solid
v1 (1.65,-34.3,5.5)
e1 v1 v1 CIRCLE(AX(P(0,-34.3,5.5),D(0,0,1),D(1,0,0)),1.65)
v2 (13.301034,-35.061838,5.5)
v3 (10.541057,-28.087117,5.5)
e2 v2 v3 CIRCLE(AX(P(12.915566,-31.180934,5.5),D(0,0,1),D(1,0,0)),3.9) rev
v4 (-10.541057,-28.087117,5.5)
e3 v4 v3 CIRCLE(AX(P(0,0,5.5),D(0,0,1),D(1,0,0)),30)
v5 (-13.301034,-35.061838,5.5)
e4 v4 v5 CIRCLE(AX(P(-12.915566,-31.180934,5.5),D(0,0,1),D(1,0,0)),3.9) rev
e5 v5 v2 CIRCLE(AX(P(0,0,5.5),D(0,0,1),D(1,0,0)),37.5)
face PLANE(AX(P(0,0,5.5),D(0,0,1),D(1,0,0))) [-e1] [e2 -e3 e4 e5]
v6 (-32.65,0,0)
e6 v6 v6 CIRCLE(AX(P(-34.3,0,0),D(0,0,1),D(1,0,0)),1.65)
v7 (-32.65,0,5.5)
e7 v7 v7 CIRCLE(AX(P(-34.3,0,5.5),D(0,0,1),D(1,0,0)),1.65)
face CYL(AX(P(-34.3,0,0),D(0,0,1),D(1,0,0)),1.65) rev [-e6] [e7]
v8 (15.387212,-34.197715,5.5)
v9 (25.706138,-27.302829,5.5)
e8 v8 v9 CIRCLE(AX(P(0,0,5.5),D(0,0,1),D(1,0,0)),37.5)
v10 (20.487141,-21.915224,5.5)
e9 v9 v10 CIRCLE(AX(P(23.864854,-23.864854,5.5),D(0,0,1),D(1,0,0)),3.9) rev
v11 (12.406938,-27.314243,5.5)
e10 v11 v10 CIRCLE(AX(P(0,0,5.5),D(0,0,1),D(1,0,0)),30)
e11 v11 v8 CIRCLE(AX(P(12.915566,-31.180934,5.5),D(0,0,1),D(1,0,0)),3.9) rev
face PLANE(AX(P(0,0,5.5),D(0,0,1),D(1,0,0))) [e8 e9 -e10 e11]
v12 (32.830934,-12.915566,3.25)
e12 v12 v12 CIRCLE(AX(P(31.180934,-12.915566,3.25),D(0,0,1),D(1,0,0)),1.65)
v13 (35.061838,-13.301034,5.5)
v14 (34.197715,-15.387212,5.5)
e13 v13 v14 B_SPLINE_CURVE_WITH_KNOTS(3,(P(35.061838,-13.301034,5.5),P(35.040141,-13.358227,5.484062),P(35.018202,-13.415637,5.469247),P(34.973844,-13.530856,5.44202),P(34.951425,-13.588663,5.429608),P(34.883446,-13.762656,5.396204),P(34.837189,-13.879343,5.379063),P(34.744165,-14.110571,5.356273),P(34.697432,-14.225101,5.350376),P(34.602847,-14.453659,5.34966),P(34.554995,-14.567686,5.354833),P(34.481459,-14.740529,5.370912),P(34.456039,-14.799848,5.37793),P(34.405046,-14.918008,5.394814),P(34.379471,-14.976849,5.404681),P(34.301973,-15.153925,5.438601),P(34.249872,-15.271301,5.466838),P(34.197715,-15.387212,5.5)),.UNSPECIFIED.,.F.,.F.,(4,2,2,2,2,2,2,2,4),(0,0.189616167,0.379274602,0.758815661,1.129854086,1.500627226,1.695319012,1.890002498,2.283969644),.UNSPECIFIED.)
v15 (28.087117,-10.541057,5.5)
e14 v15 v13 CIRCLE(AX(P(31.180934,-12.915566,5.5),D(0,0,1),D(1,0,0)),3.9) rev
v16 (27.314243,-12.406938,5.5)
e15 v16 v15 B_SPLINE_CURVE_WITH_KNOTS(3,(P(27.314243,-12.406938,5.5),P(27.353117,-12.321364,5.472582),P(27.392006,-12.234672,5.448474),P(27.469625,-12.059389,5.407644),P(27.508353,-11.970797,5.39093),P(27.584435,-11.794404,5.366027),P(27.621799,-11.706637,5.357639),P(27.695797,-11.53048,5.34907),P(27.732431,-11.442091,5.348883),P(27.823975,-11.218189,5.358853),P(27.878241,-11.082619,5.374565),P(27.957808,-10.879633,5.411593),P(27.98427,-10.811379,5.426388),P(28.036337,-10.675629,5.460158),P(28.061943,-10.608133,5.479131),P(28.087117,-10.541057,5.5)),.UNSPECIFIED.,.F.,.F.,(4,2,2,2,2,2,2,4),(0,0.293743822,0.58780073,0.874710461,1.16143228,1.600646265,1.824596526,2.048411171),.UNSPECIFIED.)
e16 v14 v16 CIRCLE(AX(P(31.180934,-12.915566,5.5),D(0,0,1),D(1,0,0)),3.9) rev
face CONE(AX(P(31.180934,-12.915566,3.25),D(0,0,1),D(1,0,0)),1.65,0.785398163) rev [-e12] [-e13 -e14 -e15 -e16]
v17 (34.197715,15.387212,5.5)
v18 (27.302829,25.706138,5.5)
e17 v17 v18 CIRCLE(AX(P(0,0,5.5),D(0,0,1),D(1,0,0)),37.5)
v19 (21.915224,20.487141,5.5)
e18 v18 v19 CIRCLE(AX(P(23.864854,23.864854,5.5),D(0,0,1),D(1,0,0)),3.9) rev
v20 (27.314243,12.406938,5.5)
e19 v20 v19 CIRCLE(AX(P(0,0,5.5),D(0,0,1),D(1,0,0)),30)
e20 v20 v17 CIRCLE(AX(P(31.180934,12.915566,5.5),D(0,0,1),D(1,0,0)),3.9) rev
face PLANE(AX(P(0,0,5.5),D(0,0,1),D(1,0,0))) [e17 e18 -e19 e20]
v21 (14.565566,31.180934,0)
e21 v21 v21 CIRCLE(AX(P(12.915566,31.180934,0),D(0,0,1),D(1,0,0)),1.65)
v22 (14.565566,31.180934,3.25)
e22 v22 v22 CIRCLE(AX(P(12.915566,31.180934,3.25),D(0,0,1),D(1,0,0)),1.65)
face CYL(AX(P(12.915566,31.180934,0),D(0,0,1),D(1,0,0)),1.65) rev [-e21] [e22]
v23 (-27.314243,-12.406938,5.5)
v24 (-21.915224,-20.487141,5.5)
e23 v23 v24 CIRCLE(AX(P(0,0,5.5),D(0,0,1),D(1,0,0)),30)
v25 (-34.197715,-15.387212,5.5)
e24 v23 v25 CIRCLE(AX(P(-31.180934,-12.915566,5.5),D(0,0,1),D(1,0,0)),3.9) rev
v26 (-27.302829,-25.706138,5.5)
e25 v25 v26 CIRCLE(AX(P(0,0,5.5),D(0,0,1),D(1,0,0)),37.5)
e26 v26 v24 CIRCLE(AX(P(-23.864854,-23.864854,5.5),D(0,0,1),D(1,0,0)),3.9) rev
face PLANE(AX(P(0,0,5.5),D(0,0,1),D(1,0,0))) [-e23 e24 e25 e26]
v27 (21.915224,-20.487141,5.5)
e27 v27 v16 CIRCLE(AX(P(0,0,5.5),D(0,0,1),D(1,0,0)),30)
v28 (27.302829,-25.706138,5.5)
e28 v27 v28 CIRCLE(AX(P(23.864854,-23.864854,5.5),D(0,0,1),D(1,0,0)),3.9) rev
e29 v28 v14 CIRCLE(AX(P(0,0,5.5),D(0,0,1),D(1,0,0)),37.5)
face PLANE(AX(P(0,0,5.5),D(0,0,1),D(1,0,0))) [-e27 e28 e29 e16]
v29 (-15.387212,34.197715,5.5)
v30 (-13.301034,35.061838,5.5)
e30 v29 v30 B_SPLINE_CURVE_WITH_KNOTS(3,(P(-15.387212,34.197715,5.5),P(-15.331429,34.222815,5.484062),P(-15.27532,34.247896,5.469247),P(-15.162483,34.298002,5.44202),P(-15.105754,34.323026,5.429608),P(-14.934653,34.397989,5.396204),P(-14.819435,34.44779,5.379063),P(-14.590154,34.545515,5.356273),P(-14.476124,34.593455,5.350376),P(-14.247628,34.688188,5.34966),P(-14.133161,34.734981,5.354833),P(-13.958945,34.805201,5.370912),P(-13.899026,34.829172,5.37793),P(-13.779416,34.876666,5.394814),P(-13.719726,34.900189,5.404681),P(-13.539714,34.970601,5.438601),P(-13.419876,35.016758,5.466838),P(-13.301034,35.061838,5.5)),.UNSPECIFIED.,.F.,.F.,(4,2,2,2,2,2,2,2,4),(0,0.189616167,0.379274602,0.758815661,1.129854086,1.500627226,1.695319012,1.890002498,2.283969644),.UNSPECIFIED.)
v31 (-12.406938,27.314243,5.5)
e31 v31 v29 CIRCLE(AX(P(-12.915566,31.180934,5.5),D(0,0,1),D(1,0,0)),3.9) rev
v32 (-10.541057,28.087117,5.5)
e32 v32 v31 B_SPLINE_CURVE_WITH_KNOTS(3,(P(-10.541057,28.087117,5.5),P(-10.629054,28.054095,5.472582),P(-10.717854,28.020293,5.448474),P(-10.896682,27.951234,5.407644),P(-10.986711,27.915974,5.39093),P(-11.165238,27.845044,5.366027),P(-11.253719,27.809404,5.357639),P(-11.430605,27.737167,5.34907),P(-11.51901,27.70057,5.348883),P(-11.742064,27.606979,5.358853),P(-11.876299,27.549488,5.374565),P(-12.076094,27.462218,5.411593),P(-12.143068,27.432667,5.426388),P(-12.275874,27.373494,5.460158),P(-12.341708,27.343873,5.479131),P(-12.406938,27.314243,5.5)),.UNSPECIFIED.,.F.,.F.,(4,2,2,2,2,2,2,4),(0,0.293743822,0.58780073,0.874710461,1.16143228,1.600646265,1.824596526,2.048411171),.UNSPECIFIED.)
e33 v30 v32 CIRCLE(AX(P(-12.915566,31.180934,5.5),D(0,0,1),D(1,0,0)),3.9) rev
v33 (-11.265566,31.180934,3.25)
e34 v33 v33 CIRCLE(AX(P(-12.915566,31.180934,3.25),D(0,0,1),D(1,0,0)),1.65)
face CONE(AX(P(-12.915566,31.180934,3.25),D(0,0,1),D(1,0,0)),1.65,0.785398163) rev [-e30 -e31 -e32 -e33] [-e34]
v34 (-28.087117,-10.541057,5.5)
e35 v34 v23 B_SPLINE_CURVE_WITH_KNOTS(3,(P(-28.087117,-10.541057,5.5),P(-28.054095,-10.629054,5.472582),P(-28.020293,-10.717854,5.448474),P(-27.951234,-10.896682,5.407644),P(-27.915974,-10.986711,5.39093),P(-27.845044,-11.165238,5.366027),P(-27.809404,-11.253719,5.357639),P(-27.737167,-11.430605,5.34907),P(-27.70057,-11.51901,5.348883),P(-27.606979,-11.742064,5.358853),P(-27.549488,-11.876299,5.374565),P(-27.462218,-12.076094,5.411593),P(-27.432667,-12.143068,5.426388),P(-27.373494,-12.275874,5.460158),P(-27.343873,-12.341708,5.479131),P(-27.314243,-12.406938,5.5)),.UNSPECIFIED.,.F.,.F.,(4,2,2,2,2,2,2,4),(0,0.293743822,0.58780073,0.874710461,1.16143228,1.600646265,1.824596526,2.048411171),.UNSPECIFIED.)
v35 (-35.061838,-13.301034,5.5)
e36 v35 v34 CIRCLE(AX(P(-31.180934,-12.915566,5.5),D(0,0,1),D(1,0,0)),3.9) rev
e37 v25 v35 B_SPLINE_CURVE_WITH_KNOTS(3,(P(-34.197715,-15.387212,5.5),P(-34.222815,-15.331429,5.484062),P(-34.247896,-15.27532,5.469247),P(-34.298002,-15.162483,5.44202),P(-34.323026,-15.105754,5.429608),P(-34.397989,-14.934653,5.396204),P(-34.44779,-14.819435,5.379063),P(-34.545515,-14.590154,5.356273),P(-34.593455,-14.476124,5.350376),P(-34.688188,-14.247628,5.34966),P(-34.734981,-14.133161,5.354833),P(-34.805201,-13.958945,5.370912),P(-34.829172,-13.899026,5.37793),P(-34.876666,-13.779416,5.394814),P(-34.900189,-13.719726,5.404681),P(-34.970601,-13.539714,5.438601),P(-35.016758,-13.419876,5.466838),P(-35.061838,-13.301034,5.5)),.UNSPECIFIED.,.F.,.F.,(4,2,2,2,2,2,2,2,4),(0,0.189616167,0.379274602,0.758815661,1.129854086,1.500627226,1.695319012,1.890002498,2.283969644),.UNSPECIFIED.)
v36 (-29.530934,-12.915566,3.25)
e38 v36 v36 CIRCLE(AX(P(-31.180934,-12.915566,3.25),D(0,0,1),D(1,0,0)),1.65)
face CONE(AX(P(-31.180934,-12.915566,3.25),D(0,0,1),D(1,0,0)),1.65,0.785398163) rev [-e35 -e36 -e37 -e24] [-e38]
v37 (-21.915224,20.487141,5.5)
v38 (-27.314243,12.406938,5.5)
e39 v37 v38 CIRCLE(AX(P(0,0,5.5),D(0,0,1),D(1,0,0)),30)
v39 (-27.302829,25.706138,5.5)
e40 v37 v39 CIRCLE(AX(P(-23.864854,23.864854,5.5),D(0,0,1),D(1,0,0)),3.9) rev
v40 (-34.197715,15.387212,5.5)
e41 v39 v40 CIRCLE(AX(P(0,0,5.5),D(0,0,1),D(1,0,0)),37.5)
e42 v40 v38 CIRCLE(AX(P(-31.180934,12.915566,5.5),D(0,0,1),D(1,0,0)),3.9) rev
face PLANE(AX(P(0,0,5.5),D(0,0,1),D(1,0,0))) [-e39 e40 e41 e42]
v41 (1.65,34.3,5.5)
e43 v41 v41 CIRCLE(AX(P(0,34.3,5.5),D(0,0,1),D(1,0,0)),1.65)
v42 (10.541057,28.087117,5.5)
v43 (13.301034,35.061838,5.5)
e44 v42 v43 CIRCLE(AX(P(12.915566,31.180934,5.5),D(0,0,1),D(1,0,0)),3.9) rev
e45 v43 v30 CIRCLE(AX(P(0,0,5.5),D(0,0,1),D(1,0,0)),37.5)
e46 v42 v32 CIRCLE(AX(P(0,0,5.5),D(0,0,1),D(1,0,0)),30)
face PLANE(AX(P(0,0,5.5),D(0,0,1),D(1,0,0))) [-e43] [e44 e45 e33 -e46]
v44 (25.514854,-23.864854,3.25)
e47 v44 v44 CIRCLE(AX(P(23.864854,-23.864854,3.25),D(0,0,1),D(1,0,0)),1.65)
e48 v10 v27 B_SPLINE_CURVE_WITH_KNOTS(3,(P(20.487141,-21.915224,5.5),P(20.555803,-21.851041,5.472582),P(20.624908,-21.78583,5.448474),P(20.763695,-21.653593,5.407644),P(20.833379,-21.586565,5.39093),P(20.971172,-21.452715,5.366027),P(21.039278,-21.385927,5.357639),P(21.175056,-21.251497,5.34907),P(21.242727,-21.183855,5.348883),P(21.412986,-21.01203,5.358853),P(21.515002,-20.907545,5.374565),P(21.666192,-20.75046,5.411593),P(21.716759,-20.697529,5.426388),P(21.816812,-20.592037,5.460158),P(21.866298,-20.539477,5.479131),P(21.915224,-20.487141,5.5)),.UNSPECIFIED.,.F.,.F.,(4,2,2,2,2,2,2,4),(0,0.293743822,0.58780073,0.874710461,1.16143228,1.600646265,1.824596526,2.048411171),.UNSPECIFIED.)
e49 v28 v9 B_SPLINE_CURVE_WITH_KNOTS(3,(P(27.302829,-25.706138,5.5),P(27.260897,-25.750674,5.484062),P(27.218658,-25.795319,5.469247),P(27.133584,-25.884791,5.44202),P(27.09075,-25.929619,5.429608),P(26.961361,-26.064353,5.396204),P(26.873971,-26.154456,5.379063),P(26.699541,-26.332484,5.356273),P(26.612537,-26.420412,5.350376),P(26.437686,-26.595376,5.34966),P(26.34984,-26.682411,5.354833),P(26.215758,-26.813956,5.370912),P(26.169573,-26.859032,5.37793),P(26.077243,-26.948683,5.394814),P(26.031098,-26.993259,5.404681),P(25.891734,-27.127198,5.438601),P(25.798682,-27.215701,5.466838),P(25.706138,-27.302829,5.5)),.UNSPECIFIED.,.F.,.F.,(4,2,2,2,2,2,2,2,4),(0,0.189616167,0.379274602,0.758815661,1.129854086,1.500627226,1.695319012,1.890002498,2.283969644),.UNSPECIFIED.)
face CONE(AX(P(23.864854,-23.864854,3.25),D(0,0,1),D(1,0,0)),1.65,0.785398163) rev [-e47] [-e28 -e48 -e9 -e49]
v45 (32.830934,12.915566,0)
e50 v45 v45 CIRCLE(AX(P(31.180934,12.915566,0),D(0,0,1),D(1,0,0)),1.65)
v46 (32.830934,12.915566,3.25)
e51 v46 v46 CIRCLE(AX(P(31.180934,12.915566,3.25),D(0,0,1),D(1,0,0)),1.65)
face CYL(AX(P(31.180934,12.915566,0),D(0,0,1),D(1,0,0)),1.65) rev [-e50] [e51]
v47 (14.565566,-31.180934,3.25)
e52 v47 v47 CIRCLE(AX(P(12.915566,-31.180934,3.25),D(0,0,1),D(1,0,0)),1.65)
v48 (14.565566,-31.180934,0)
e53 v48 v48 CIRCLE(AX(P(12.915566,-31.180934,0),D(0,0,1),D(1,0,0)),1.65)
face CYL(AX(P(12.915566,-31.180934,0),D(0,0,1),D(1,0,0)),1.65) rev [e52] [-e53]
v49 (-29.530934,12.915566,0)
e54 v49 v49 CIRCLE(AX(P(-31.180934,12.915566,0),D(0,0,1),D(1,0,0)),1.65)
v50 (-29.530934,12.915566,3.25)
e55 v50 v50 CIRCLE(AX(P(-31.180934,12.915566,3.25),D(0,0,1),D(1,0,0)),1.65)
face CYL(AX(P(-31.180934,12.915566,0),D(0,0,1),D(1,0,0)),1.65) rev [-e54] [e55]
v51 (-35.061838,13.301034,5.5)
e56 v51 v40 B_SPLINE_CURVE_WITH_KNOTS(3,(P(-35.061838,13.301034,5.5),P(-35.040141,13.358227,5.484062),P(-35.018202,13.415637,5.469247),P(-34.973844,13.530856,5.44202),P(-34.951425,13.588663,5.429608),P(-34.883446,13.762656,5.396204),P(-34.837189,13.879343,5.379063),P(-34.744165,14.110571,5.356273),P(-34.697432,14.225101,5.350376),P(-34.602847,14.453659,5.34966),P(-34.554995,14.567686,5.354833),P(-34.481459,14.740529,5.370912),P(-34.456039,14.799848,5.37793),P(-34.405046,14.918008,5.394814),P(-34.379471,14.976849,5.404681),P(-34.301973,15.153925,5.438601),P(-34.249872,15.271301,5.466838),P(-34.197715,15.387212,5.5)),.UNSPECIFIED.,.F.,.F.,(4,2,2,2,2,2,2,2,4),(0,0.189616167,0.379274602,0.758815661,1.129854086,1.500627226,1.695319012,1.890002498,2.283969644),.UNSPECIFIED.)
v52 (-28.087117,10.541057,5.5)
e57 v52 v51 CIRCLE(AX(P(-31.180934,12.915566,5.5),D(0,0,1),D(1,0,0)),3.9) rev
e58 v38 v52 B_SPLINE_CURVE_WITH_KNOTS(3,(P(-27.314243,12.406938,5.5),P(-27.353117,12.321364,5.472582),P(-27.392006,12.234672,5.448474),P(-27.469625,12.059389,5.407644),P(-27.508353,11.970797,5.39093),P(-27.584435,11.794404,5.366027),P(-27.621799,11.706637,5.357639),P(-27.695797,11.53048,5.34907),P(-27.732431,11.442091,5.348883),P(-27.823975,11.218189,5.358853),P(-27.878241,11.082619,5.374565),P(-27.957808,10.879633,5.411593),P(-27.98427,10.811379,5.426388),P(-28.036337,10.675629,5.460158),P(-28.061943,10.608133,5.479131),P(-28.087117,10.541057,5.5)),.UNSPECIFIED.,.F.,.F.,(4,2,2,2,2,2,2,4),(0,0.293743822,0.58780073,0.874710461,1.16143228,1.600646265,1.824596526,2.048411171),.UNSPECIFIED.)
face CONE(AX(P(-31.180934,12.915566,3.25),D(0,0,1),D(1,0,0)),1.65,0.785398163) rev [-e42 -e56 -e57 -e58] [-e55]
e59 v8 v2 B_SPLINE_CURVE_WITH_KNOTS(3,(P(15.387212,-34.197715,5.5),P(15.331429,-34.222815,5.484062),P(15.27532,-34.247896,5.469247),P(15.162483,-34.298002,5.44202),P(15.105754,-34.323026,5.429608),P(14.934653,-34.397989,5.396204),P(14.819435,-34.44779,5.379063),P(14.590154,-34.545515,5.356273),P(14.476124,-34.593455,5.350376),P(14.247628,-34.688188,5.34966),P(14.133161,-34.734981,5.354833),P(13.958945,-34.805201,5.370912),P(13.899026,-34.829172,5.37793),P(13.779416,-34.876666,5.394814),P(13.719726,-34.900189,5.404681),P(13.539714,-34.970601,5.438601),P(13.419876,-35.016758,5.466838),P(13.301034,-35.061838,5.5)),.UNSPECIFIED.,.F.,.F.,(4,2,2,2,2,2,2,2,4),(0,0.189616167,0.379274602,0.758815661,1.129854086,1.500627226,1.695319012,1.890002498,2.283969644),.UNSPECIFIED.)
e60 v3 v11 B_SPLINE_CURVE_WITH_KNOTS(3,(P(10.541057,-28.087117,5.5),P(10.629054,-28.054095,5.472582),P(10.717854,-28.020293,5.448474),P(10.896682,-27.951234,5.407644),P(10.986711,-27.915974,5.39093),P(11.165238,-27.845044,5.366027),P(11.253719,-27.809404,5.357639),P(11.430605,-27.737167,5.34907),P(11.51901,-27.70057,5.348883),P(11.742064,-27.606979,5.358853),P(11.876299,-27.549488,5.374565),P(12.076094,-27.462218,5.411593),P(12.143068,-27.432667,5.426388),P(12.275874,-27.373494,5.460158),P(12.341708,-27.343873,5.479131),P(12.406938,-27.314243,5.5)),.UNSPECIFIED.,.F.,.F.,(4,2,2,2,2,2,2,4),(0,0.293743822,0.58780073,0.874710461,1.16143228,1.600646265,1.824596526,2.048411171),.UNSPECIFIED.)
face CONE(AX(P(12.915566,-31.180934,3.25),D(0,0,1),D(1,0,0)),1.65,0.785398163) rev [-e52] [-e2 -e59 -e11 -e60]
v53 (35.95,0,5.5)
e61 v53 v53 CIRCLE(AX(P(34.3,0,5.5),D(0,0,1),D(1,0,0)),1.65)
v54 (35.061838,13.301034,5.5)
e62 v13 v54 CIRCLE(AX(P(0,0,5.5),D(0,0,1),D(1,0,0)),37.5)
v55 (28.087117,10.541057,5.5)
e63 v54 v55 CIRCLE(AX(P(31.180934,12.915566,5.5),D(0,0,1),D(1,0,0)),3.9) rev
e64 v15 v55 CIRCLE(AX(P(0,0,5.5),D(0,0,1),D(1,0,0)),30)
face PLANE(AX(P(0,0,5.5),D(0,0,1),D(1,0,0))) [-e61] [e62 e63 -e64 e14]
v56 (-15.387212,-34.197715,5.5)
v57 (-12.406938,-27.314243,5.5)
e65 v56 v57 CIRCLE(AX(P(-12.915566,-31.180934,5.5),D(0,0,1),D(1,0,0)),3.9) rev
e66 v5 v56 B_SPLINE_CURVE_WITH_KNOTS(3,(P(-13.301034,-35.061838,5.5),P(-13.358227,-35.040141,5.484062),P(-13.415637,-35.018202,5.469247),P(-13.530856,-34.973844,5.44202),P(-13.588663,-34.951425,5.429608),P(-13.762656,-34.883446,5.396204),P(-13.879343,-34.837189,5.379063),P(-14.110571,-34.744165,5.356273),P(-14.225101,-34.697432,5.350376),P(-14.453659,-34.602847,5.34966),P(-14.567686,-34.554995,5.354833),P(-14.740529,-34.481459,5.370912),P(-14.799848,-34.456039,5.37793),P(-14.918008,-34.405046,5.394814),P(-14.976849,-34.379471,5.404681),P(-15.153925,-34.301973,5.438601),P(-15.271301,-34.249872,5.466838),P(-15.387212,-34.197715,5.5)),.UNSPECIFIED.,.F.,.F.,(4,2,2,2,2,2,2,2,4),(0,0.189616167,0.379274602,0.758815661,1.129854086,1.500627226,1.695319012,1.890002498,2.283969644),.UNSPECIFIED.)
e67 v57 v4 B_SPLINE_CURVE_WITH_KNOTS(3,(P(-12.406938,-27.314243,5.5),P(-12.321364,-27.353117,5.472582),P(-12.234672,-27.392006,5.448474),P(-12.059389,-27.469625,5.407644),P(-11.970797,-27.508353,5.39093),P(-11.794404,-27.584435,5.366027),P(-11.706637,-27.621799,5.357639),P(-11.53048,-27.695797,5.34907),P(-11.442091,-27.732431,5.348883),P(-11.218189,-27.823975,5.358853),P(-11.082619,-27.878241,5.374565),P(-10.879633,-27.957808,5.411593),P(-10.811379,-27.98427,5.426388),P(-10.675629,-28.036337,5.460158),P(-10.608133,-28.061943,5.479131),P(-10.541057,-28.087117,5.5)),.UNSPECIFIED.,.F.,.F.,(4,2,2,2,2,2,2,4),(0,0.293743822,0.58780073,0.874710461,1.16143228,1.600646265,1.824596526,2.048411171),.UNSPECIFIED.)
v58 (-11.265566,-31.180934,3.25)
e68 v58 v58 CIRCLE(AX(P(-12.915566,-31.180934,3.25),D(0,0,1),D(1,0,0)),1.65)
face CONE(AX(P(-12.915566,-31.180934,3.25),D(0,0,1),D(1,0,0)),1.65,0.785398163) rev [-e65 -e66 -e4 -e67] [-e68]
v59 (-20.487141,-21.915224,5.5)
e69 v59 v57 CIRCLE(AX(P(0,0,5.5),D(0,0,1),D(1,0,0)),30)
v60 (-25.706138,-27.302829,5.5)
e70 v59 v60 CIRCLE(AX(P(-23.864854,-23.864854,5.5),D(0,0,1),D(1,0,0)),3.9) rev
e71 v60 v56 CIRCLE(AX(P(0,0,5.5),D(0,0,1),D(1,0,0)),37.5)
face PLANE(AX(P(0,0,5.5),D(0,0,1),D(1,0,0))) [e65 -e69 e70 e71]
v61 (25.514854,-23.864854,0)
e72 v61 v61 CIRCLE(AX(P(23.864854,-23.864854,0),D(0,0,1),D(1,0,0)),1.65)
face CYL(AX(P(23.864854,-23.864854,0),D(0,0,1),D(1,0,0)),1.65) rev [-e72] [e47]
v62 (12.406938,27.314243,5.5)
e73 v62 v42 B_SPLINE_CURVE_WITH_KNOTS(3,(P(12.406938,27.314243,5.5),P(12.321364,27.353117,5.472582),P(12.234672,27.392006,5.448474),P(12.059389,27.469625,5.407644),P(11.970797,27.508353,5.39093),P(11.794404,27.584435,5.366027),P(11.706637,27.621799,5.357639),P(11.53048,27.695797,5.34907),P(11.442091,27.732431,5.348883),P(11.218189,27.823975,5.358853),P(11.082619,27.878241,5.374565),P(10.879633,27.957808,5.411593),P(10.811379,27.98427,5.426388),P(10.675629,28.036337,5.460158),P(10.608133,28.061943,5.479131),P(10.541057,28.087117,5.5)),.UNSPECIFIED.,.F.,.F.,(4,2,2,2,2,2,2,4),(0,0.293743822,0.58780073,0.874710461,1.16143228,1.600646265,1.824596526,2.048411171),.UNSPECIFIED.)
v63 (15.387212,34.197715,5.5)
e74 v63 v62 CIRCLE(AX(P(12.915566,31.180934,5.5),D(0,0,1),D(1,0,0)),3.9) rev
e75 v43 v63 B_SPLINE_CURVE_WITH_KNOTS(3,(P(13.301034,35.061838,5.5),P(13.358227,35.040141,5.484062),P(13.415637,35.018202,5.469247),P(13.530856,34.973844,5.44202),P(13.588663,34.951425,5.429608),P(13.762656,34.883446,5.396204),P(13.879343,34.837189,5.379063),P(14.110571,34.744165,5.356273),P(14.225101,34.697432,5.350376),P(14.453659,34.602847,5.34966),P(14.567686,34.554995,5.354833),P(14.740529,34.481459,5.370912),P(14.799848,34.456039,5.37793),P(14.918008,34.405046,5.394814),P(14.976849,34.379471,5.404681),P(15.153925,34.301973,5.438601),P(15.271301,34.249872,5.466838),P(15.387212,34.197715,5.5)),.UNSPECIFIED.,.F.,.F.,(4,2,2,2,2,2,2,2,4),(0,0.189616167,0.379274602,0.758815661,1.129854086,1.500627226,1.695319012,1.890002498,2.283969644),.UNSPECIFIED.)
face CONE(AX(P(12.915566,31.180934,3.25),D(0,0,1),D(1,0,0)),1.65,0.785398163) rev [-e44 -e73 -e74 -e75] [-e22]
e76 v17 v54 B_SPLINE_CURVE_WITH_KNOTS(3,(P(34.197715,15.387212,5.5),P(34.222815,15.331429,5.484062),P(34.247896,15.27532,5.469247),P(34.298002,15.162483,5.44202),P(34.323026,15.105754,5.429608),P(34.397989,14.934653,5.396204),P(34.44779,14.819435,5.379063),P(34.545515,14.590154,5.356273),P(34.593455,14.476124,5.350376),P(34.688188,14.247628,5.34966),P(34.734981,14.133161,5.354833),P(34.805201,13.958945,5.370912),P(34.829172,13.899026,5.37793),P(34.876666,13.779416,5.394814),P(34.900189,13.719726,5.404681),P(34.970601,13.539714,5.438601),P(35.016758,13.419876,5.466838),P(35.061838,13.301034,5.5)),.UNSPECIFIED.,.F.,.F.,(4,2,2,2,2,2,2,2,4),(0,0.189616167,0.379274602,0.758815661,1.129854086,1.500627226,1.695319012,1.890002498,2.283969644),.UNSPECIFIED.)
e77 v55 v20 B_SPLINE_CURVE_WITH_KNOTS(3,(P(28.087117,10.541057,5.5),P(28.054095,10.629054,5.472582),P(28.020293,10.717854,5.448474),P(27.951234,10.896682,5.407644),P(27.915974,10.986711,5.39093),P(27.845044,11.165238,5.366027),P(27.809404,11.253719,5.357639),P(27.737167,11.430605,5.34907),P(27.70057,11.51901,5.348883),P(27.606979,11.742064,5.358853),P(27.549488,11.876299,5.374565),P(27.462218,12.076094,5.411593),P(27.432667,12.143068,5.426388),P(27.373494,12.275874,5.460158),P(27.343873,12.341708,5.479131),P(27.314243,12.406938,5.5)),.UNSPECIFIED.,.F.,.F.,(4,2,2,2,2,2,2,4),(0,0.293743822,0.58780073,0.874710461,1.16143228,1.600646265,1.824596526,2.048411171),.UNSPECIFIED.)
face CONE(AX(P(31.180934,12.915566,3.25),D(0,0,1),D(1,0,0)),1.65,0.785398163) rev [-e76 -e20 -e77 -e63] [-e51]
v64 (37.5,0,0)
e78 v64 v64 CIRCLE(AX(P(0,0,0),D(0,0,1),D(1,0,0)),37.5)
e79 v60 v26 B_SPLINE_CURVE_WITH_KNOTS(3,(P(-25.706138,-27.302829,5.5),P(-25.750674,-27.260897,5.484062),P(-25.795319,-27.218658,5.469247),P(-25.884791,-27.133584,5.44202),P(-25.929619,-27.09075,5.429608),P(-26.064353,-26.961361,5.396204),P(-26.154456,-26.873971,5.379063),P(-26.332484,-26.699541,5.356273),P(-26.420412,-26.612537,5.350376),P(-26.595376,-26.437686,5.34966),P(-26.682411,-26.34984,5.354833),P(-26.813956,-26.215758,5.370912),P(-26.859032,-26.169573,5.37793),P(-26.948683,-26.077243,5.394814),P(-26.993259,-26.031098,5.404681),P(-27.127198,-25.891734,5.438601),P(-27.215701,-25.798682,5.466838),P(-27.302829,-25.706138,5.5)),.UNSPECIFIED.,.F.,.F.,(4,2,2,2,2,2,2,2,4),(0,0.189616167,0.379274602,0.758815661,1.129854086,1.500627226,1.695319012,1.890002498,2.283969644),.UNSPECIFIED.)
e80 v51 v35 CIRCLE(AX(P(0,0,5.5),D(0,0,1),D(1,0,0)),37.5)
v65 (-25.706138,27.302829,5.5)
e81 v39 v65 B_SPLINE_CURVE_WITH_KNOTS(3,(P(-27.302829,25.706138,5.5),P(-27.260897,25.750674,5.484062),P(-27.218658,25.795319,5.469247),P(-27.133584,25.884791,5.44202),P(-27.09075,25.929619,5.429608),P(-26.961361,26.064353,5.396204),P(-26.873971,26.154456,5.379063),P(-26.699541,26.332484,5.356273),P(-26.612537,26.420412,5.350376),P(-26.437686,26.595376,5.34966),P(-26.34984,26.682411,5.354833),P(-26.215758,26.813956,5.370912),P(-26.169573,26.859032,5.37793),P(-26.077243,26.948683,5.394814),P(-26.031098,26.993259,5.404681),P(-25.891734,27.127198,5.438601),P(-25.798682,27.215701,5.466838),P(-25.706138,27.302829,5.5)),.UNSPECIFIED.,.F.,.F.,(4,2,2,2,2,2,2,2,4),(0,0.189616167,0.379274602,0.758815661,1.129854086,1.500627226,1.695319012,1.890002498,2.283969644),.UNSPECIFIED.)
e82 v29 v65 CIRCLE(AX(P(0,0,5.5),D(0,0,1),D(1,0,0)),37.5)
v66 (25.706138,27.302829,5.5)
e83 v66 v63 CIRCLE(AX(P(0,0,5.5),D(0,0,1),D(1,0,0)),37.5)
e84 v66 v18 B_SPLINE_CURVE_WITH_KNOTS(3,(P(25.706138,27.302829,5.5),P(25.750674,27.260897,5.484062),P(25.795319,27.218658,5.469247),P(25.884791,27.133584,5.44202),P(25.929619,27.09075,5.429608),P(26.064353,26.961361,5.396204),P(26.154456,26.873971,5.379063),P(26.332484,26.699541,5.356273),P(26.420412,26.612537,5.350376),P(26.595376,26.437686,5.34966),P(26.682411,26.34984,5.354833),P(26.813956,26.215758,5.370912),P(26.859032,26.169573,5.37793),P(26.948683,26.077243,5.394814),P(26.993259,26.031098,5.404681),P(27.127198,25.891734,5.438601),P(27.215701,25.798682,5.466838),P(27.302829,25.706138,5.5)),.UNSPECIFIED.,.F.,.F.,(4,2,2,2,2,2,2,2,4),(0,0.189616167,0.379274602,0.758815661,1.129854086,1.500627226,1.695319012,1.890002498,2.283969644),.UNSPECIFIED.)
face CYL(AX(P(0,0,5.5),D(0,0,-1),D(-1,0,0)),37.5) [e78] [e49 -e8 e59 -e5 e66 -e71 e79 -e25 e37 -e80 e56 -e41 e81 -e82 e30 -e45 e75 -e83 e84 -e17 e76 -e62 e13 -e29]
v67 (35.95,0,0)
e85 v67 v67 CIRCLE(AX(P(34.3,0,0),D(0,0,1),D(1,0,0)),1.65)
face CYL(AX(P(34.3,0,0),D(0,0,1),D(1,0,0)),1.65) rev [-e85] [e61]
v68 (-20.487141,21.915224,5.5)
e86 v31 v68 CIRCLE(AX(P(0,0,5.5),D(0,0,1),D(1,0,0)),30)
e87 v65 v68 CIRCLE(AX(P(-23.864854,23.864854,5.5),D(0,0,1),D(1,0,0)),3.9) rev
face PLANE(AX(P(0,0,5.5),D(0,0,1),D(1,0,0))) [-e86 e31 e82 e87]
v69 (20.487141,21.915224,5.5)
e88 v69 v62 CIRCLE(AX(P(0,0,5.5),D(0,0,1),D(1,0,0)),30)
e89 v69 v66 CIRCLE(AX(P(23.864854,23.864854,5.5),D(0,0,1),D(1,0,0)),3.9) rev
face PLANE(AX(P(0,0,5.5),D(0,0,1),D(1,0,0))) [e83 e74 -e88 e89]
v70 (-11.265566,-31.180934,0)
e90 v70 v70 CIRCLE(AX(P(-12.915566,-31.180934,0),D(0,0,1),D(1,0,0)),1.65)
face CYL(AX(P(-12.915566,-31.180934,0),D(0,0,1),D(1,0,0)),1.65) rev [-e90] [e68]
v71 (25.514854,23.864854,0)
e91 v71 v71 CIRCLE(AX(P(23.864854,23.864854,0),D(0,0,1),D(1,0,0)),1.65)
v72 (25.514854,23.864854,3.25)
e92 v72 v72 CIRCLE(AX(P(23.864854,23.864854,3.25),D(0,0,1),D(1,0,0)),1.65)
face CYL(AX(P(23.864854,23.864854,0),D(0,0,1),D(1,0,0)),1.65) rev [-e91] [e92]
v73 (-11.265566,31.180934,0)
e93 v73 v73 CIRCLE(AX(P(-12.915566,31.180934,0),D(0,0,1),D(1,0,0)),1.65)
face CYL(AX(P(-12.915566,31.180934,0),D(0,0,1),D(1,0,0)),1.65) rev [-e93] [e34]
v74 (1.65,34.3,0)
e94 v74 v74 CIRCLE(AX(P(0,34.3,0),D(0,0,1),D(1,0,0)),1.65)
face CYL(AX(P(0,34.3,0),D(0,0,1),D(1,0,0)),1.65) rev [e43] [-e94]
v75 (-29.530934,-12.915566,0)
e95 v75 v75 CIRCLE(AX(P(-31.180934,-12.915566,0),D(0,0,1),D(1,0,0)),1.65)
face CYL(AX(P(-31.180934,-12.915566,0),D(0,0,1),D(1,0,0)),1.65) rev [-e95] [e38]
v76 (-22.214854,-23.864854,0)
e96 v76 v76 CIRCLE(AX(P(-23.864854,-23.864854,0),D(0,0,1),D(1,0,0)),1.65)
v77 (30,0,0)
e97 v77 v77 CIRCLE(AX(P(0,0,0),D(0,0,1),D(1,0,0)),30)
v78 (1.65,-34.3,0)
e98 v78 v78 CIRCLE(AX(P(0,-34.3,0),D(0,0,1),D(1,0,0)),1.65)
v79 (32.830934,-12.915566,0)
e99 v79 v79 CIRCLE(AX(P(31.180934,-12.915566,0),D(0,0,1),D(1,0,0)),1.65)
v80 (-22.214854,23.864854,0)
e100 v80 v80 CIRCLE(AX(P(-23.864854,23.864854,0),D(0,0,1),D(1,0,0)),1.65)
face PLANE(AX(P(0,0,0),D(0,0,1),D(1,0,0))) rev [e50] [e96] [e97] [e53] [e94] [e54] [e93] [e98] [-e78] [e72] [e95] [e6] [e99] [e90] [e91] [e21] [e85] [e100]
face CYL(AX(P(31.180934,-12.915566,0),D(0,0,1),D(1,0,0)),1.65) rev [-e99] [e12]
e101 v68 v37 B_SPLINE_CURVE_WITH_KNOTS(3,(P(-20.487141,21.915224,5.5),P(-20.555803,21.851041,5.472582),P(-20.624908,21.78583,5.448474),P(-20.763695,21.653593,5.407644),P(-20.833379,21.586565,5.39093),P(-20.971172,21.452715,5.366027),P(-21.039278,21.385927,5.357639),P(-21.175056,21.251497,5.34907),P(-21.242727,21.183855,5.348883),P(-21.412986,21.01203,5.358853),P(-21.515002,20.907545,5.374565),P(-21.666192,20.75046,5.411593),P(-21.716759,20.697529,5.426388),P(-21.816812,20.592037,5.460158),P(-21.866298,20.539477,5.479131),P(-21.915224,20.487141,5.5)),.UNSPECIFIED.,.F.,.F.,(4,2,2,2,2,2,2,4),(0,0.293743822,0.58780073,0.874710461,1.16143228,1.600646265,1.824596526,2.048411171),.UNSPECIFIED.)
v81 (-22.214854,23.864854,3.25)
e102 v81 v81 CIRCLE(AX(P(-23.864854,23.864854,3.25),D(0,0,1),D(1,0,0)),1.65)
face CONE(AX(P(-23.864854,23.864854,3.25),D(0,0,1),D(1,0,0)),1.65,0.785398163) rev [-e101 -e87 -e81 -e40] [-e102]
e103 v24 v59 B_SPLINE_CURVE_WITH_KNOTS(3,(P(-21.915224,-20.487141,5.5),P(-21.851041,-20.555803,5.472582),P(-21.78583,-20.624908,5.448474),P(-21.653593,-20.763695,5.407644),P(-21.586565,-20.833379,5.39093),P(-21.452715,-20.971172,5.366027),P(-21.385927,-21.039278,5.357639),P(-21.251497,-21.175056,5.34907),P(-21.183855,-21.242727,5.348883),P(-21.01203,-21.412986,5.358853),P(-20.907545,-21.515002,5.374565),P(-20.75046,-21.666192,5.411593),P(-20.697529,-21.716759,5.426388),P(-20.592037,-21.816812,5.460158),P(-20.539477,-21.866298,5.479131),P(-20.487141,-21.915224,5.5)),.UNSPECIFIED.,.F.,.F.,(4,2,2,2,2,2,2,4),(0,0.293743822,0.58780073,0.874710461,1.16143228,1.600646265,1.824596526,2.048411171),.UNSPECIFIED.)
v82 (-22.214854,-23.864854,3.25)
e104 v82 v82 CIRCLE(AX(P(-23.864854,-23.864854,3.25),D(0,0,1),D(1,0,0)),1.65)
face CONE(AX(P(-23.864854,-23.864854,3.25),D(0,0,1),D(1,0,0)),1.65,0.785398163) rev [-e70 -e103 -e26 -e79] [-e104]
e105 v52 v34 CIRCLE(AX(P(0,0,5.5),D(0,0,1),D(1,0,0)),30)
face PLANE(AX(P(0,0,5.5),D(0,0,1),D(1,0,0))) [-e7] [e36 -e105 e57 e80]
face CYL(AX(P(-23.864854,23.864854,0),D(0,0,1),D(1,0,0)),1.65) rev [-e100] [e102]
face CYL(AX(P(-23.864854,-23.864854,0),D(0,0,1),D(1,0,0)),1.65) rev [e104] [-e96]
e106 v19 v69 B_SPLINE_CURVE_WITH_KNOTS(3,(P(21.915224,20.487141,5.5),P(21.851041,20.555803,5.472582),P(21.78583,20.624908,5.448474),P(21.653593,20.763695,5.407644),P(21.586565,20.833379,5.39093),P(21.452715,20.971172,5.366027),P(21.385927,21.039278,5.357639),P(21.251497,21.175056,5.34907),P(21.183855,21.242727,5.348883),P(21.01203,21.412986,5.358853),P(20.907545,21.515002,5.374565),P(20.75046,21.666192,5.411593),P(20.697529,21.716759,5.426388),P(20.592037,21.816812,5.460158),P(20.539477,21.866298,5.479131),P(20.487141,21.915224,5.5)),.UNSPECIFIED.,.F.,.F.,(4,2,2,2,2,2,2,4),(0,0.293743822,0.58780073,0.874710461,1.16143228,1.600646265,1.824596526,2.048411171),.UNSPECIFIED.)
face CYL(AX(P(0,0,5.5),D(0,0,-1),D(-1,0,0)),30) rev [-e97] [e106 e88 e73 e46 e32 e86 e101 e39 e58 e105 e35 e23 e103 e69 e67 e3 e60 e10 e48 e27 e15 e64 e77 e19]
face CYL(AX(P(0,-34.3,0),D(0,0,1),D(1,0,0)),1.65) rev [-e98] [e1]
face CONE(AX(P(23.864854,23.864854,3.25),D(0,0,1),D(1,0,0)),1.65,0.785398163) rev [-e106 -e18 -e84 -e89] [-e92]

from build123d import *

# Parameters (mm, degrees)
ESQUISSE1_R             = 37.5
ESQUISSE1_R_2           = 30
BOSS_EXTRU_1_DEPTH      = 5.5
ESQUISSE2_R             = 1.65
ENL_V_MAT_EXTRU_1_DEPTH = 54.31744555
CHANFREIN1_SIZE         = 2.25


with BuildPart() as part:
    # Esquisse1 → Boss.-Extru.1 (new body)
    with BuildSketch(Plane.XY):
        Circle(ESQUISSE1_R)
        Circle(ESQUISSE1_R_2, mode=Mode.SUBTRACT)
    extrude(amount=BOSS_EXTRU_1_DEPTH)

    # Esquisse2 → Enlèv. mat.-Extru.1 (cut, through all)
    with BuildSketch(Plane.XY.offset(5.5)):
        with Locations((0, 34.3)):
            Circle(ESQUISSE2_R)
        with Locations((12.915565842, 31.180934222)):
            Circle(ESQUISSE2_R)
        with Locations((23.864853865, 23.864853865)):
            Circle(ESQUISSE2_R)
        with Locations((31.180934222, 12.915565842)):
            Circle(ESQUISSE2_R)
        with Locations((34.3, 0)):
            Circle(ESQUISSE2_R)
        with Locations((31.180934222, -12.915565842)):
            Circle(ESQUISSE2_R)
        with Locations((23.864853865, -23.864853865)):
            Circle(ESQUISSE2_R)
        with Locations((12.915565842, -31.180934222)):
            Circle(ESQUISSE2_R)
        with Locations((0, -34.3)):
            Circle(ESQUISSE2_R)
        with Locations((-12.915565842, -31.180934222)):
            Circle(ESQUISSE2_R)
        with Locations((-23.864853865, -23.864853865)):
            Circle(ESQUISSE2_R)
        with Locations((-31.180934222, -12.915565842)):
            Circle(ESQUISSE2_R)
        with Locations((-34.3, 0)):
            Circle(ESQUISSE2_R)
        with Locations((-31.180934222, 12.915565842)):
            Circle(ESQUISSE2_R)
        with Locations((-23.864853865, 23.864853865)):
            Circle(ESQUISSE2_R)
        with Locations((-12.915565842, 31.180934222)):
            Circle(ESQUISSE2_R)
    extrude(amount=-ENL_V_MAT_EXTRU_1_DEPTH, mode=Mode.SUBTRACT)

    # Chanfrein1
    # the kernel refuses this chamfer: 2.25 mm, written as the material it takes off along each edge
    with BuildSketch(Plane(origin=(-12.915565842, 31.180934222, 5.5), x_dir=(1, 0, 0), z_dir=(0, -1, 0))) as chanfrein1_piece_1:
        Polygon((1.65 + CHANFREIN1_SIZE, 0), (1.65, -CHANFREIN1_SIZE), (1.65, 0), align=None)
    revolve(axis=Axis((-12.915565842, 31.180934222, 5.5), (0, 0, 1)), mode=Mode.SUBTRACT)
    with BuildSketch(Plane(origin=(-23.864853865, 23.864853865, 5.5), x_dir=(1, 0, 0), z_dir=(0, -1, 0))) as chanfrein1_piece_2:
        Polygon((1.65 + CHANFREIN1_SIZE, 0), (1.65, -CHANFREIN1_SIZE), (1.65, 0), align=None)
    revolve(axis=Axis((-23.864853865, 23.864853865, 5.5), (0, 0, 1)), mode=Mode.SUBTRACT)
    with BuildSketch(Plane(origin=(-31.180934222, 12.915565842, 5.5), x_dir=(1, 0, 0), z_dir=(0, -1, 0))) as chanfrein1_piece_3:
        Polygon((1.65 + CHANFREIN1_SIZE, 0), (1.65, -CHANFREIN1_SIZE), (1.65, 0), align=None)
    revolve(axis=Axis((-31.180934222, 12.915565842, 5.5), (0, 0, 1)), mode=Mode.SUBTRACT)
    with BuildSketch(Plane(origin=(-31.180934222, -12.915565842, 5.5), x_dir=(1, 0, 0), z_dir=(0, -1, 0))) as chanfrein1_piece_4:
        Polygon((1.65 + CHANFREIN1_SIZE, 0), (1.65, -CHANFREIN1_SIZE), (1.65, 0), align=None)
    revolve(axis=Axis((-31.180934222, -12.915565842, 5.5), (0, 0, 1)), mode=Mode.SUBTRACT)
    with BuildSketch(Plane(origin=(-23.864853865, -23.864853865, 5.5), x_dir=(1, 0, 0), z_dir=(0, -1, 0))) as chanfrein1_piece_5:
        Polygon((1.65 + CHANFREIN1_SIZE, 0), (1.65, -CHANFREIN1_SIZE), (1.65, 0), align=None)
    revolve(axis=Axis((-23.864853865, -23.864853865, 5.5), (0, 0, 1)), mode=Mode.SUBTRACT)
    with BuildSketch(Plane(origin=(-12.915565842, -31.180934222, 5.5), x_dir=(1, 0, 0), z_dir=(0, -1, 0))) as chanfrein1_piece_6:
        Polygon((1.65 + CHANFREIN1_SIZE, 0), (1.65, -CHANFREIN1_SIZE), (1.65, 0), align=None)
    revolve(axis=Axis((-12.915565842, -31.180934222, 5.5), (0, 0, 1)), mode=Mode.SUBTRACT)
    with BuildSketch(Plane(origin=(12.915565842, -31.180934222, 5.5), x_dir=(1, 0, 0), z_dir=(0, -1, 0))) as chanfrein1_piece_7:
        Polygon((1.65 + CHANFREIN1_SIZE, 0), (1.65, -CHANFREIN1_SIZE), (1.65, 0), align=None)
    revolve(axis=Axis((12.915565842, -31.180934222, 5.5), (0, 0, 1)), mode=Mode.SUBTRACT)
    with BuildSketch(Plane(origin=(23.864853865, -23.864853865, 5.5), x_dir=(1, 0, 0), z_dir=(0, -1, 0))) as chanfrein1_piece_8:
        Polygon((1.65 + CHANFREIN1_SIZE, 0), (1.65, -CHANFREIN1_SIZE), (1.65, 0), align=None)
    revolve(axis=Axis((23.864853865, -23.864853865, 5.5), (0, 0, 1)), mode=Mode.SUBTRACT)
    with BuildSketch(Plane(origin=(31.180934222, -12.915565842, 5.5), x_dir=(1, 0, 0), z_dir=(0, -1, 0))) as chanfrein1_piece_9:
        Polygon((1.65 + CHANFREIN1_SIZE, 0), (1.65, -CHANFREIN1_SIZE), (1.65, 0), align=None)
    revolve(axis=Axis((31.180934222, -12.915565842, 5.5), (0, 0, 1)), mode=Mode.SUBTRACT)
    with BuildSketch(Plane(origin=(31.180934222, 12.915565842, 5.5), x_dir=(1, 0, 0), z_dir=(0, -1, 0))) as chanfrein1_piece_10:
        Polygon((1.65 + CHANFREIN1_SIZE, 0), (1.65, -CHANFREIN1_SIZE), (1.65, 0), align=None)
    revolve(axis=Axis((31.180934222, 12.915565842, 5.5), (0, 0, 1)), mode=Mode.SUBTRACT)
    with BuildSketch(Plane(origin=(23.864853865, 23.864853865, 5.5), x_dir=(1, 0, 0), z_dir=(0, -1, 0))) as chanfrein1_piece_11:
        Polygon((1.65 + CHANFREIN1_SIZE, 0), (1.65, -CHANFREIN1_SIZE), (1.65, 0), align=None)
    revolve(axis=Axis((23.864853865, 23.864853865, 5.5), (0, 0, 1)), mode=Mode.SUBTRACT)
    with BuildSketch(Plane(origin=(12.915565842, 31.180934222, 5.5), x_dir=(1, 0, 0), z_dir=(0, -1, 0))) as chanfrein1_piece_12:
        Polygon((1.65 + CHANFREIN1_SIZE, 0), (1.65, -CHANFREIN1_SIZE), (1.65, 0), align=None)
    revolve(axis=Axis((12.915565842, 31.180934222, 5.5), (0, 0, 1)), mode=Mode.SUBTRACT)


solid = part.part
